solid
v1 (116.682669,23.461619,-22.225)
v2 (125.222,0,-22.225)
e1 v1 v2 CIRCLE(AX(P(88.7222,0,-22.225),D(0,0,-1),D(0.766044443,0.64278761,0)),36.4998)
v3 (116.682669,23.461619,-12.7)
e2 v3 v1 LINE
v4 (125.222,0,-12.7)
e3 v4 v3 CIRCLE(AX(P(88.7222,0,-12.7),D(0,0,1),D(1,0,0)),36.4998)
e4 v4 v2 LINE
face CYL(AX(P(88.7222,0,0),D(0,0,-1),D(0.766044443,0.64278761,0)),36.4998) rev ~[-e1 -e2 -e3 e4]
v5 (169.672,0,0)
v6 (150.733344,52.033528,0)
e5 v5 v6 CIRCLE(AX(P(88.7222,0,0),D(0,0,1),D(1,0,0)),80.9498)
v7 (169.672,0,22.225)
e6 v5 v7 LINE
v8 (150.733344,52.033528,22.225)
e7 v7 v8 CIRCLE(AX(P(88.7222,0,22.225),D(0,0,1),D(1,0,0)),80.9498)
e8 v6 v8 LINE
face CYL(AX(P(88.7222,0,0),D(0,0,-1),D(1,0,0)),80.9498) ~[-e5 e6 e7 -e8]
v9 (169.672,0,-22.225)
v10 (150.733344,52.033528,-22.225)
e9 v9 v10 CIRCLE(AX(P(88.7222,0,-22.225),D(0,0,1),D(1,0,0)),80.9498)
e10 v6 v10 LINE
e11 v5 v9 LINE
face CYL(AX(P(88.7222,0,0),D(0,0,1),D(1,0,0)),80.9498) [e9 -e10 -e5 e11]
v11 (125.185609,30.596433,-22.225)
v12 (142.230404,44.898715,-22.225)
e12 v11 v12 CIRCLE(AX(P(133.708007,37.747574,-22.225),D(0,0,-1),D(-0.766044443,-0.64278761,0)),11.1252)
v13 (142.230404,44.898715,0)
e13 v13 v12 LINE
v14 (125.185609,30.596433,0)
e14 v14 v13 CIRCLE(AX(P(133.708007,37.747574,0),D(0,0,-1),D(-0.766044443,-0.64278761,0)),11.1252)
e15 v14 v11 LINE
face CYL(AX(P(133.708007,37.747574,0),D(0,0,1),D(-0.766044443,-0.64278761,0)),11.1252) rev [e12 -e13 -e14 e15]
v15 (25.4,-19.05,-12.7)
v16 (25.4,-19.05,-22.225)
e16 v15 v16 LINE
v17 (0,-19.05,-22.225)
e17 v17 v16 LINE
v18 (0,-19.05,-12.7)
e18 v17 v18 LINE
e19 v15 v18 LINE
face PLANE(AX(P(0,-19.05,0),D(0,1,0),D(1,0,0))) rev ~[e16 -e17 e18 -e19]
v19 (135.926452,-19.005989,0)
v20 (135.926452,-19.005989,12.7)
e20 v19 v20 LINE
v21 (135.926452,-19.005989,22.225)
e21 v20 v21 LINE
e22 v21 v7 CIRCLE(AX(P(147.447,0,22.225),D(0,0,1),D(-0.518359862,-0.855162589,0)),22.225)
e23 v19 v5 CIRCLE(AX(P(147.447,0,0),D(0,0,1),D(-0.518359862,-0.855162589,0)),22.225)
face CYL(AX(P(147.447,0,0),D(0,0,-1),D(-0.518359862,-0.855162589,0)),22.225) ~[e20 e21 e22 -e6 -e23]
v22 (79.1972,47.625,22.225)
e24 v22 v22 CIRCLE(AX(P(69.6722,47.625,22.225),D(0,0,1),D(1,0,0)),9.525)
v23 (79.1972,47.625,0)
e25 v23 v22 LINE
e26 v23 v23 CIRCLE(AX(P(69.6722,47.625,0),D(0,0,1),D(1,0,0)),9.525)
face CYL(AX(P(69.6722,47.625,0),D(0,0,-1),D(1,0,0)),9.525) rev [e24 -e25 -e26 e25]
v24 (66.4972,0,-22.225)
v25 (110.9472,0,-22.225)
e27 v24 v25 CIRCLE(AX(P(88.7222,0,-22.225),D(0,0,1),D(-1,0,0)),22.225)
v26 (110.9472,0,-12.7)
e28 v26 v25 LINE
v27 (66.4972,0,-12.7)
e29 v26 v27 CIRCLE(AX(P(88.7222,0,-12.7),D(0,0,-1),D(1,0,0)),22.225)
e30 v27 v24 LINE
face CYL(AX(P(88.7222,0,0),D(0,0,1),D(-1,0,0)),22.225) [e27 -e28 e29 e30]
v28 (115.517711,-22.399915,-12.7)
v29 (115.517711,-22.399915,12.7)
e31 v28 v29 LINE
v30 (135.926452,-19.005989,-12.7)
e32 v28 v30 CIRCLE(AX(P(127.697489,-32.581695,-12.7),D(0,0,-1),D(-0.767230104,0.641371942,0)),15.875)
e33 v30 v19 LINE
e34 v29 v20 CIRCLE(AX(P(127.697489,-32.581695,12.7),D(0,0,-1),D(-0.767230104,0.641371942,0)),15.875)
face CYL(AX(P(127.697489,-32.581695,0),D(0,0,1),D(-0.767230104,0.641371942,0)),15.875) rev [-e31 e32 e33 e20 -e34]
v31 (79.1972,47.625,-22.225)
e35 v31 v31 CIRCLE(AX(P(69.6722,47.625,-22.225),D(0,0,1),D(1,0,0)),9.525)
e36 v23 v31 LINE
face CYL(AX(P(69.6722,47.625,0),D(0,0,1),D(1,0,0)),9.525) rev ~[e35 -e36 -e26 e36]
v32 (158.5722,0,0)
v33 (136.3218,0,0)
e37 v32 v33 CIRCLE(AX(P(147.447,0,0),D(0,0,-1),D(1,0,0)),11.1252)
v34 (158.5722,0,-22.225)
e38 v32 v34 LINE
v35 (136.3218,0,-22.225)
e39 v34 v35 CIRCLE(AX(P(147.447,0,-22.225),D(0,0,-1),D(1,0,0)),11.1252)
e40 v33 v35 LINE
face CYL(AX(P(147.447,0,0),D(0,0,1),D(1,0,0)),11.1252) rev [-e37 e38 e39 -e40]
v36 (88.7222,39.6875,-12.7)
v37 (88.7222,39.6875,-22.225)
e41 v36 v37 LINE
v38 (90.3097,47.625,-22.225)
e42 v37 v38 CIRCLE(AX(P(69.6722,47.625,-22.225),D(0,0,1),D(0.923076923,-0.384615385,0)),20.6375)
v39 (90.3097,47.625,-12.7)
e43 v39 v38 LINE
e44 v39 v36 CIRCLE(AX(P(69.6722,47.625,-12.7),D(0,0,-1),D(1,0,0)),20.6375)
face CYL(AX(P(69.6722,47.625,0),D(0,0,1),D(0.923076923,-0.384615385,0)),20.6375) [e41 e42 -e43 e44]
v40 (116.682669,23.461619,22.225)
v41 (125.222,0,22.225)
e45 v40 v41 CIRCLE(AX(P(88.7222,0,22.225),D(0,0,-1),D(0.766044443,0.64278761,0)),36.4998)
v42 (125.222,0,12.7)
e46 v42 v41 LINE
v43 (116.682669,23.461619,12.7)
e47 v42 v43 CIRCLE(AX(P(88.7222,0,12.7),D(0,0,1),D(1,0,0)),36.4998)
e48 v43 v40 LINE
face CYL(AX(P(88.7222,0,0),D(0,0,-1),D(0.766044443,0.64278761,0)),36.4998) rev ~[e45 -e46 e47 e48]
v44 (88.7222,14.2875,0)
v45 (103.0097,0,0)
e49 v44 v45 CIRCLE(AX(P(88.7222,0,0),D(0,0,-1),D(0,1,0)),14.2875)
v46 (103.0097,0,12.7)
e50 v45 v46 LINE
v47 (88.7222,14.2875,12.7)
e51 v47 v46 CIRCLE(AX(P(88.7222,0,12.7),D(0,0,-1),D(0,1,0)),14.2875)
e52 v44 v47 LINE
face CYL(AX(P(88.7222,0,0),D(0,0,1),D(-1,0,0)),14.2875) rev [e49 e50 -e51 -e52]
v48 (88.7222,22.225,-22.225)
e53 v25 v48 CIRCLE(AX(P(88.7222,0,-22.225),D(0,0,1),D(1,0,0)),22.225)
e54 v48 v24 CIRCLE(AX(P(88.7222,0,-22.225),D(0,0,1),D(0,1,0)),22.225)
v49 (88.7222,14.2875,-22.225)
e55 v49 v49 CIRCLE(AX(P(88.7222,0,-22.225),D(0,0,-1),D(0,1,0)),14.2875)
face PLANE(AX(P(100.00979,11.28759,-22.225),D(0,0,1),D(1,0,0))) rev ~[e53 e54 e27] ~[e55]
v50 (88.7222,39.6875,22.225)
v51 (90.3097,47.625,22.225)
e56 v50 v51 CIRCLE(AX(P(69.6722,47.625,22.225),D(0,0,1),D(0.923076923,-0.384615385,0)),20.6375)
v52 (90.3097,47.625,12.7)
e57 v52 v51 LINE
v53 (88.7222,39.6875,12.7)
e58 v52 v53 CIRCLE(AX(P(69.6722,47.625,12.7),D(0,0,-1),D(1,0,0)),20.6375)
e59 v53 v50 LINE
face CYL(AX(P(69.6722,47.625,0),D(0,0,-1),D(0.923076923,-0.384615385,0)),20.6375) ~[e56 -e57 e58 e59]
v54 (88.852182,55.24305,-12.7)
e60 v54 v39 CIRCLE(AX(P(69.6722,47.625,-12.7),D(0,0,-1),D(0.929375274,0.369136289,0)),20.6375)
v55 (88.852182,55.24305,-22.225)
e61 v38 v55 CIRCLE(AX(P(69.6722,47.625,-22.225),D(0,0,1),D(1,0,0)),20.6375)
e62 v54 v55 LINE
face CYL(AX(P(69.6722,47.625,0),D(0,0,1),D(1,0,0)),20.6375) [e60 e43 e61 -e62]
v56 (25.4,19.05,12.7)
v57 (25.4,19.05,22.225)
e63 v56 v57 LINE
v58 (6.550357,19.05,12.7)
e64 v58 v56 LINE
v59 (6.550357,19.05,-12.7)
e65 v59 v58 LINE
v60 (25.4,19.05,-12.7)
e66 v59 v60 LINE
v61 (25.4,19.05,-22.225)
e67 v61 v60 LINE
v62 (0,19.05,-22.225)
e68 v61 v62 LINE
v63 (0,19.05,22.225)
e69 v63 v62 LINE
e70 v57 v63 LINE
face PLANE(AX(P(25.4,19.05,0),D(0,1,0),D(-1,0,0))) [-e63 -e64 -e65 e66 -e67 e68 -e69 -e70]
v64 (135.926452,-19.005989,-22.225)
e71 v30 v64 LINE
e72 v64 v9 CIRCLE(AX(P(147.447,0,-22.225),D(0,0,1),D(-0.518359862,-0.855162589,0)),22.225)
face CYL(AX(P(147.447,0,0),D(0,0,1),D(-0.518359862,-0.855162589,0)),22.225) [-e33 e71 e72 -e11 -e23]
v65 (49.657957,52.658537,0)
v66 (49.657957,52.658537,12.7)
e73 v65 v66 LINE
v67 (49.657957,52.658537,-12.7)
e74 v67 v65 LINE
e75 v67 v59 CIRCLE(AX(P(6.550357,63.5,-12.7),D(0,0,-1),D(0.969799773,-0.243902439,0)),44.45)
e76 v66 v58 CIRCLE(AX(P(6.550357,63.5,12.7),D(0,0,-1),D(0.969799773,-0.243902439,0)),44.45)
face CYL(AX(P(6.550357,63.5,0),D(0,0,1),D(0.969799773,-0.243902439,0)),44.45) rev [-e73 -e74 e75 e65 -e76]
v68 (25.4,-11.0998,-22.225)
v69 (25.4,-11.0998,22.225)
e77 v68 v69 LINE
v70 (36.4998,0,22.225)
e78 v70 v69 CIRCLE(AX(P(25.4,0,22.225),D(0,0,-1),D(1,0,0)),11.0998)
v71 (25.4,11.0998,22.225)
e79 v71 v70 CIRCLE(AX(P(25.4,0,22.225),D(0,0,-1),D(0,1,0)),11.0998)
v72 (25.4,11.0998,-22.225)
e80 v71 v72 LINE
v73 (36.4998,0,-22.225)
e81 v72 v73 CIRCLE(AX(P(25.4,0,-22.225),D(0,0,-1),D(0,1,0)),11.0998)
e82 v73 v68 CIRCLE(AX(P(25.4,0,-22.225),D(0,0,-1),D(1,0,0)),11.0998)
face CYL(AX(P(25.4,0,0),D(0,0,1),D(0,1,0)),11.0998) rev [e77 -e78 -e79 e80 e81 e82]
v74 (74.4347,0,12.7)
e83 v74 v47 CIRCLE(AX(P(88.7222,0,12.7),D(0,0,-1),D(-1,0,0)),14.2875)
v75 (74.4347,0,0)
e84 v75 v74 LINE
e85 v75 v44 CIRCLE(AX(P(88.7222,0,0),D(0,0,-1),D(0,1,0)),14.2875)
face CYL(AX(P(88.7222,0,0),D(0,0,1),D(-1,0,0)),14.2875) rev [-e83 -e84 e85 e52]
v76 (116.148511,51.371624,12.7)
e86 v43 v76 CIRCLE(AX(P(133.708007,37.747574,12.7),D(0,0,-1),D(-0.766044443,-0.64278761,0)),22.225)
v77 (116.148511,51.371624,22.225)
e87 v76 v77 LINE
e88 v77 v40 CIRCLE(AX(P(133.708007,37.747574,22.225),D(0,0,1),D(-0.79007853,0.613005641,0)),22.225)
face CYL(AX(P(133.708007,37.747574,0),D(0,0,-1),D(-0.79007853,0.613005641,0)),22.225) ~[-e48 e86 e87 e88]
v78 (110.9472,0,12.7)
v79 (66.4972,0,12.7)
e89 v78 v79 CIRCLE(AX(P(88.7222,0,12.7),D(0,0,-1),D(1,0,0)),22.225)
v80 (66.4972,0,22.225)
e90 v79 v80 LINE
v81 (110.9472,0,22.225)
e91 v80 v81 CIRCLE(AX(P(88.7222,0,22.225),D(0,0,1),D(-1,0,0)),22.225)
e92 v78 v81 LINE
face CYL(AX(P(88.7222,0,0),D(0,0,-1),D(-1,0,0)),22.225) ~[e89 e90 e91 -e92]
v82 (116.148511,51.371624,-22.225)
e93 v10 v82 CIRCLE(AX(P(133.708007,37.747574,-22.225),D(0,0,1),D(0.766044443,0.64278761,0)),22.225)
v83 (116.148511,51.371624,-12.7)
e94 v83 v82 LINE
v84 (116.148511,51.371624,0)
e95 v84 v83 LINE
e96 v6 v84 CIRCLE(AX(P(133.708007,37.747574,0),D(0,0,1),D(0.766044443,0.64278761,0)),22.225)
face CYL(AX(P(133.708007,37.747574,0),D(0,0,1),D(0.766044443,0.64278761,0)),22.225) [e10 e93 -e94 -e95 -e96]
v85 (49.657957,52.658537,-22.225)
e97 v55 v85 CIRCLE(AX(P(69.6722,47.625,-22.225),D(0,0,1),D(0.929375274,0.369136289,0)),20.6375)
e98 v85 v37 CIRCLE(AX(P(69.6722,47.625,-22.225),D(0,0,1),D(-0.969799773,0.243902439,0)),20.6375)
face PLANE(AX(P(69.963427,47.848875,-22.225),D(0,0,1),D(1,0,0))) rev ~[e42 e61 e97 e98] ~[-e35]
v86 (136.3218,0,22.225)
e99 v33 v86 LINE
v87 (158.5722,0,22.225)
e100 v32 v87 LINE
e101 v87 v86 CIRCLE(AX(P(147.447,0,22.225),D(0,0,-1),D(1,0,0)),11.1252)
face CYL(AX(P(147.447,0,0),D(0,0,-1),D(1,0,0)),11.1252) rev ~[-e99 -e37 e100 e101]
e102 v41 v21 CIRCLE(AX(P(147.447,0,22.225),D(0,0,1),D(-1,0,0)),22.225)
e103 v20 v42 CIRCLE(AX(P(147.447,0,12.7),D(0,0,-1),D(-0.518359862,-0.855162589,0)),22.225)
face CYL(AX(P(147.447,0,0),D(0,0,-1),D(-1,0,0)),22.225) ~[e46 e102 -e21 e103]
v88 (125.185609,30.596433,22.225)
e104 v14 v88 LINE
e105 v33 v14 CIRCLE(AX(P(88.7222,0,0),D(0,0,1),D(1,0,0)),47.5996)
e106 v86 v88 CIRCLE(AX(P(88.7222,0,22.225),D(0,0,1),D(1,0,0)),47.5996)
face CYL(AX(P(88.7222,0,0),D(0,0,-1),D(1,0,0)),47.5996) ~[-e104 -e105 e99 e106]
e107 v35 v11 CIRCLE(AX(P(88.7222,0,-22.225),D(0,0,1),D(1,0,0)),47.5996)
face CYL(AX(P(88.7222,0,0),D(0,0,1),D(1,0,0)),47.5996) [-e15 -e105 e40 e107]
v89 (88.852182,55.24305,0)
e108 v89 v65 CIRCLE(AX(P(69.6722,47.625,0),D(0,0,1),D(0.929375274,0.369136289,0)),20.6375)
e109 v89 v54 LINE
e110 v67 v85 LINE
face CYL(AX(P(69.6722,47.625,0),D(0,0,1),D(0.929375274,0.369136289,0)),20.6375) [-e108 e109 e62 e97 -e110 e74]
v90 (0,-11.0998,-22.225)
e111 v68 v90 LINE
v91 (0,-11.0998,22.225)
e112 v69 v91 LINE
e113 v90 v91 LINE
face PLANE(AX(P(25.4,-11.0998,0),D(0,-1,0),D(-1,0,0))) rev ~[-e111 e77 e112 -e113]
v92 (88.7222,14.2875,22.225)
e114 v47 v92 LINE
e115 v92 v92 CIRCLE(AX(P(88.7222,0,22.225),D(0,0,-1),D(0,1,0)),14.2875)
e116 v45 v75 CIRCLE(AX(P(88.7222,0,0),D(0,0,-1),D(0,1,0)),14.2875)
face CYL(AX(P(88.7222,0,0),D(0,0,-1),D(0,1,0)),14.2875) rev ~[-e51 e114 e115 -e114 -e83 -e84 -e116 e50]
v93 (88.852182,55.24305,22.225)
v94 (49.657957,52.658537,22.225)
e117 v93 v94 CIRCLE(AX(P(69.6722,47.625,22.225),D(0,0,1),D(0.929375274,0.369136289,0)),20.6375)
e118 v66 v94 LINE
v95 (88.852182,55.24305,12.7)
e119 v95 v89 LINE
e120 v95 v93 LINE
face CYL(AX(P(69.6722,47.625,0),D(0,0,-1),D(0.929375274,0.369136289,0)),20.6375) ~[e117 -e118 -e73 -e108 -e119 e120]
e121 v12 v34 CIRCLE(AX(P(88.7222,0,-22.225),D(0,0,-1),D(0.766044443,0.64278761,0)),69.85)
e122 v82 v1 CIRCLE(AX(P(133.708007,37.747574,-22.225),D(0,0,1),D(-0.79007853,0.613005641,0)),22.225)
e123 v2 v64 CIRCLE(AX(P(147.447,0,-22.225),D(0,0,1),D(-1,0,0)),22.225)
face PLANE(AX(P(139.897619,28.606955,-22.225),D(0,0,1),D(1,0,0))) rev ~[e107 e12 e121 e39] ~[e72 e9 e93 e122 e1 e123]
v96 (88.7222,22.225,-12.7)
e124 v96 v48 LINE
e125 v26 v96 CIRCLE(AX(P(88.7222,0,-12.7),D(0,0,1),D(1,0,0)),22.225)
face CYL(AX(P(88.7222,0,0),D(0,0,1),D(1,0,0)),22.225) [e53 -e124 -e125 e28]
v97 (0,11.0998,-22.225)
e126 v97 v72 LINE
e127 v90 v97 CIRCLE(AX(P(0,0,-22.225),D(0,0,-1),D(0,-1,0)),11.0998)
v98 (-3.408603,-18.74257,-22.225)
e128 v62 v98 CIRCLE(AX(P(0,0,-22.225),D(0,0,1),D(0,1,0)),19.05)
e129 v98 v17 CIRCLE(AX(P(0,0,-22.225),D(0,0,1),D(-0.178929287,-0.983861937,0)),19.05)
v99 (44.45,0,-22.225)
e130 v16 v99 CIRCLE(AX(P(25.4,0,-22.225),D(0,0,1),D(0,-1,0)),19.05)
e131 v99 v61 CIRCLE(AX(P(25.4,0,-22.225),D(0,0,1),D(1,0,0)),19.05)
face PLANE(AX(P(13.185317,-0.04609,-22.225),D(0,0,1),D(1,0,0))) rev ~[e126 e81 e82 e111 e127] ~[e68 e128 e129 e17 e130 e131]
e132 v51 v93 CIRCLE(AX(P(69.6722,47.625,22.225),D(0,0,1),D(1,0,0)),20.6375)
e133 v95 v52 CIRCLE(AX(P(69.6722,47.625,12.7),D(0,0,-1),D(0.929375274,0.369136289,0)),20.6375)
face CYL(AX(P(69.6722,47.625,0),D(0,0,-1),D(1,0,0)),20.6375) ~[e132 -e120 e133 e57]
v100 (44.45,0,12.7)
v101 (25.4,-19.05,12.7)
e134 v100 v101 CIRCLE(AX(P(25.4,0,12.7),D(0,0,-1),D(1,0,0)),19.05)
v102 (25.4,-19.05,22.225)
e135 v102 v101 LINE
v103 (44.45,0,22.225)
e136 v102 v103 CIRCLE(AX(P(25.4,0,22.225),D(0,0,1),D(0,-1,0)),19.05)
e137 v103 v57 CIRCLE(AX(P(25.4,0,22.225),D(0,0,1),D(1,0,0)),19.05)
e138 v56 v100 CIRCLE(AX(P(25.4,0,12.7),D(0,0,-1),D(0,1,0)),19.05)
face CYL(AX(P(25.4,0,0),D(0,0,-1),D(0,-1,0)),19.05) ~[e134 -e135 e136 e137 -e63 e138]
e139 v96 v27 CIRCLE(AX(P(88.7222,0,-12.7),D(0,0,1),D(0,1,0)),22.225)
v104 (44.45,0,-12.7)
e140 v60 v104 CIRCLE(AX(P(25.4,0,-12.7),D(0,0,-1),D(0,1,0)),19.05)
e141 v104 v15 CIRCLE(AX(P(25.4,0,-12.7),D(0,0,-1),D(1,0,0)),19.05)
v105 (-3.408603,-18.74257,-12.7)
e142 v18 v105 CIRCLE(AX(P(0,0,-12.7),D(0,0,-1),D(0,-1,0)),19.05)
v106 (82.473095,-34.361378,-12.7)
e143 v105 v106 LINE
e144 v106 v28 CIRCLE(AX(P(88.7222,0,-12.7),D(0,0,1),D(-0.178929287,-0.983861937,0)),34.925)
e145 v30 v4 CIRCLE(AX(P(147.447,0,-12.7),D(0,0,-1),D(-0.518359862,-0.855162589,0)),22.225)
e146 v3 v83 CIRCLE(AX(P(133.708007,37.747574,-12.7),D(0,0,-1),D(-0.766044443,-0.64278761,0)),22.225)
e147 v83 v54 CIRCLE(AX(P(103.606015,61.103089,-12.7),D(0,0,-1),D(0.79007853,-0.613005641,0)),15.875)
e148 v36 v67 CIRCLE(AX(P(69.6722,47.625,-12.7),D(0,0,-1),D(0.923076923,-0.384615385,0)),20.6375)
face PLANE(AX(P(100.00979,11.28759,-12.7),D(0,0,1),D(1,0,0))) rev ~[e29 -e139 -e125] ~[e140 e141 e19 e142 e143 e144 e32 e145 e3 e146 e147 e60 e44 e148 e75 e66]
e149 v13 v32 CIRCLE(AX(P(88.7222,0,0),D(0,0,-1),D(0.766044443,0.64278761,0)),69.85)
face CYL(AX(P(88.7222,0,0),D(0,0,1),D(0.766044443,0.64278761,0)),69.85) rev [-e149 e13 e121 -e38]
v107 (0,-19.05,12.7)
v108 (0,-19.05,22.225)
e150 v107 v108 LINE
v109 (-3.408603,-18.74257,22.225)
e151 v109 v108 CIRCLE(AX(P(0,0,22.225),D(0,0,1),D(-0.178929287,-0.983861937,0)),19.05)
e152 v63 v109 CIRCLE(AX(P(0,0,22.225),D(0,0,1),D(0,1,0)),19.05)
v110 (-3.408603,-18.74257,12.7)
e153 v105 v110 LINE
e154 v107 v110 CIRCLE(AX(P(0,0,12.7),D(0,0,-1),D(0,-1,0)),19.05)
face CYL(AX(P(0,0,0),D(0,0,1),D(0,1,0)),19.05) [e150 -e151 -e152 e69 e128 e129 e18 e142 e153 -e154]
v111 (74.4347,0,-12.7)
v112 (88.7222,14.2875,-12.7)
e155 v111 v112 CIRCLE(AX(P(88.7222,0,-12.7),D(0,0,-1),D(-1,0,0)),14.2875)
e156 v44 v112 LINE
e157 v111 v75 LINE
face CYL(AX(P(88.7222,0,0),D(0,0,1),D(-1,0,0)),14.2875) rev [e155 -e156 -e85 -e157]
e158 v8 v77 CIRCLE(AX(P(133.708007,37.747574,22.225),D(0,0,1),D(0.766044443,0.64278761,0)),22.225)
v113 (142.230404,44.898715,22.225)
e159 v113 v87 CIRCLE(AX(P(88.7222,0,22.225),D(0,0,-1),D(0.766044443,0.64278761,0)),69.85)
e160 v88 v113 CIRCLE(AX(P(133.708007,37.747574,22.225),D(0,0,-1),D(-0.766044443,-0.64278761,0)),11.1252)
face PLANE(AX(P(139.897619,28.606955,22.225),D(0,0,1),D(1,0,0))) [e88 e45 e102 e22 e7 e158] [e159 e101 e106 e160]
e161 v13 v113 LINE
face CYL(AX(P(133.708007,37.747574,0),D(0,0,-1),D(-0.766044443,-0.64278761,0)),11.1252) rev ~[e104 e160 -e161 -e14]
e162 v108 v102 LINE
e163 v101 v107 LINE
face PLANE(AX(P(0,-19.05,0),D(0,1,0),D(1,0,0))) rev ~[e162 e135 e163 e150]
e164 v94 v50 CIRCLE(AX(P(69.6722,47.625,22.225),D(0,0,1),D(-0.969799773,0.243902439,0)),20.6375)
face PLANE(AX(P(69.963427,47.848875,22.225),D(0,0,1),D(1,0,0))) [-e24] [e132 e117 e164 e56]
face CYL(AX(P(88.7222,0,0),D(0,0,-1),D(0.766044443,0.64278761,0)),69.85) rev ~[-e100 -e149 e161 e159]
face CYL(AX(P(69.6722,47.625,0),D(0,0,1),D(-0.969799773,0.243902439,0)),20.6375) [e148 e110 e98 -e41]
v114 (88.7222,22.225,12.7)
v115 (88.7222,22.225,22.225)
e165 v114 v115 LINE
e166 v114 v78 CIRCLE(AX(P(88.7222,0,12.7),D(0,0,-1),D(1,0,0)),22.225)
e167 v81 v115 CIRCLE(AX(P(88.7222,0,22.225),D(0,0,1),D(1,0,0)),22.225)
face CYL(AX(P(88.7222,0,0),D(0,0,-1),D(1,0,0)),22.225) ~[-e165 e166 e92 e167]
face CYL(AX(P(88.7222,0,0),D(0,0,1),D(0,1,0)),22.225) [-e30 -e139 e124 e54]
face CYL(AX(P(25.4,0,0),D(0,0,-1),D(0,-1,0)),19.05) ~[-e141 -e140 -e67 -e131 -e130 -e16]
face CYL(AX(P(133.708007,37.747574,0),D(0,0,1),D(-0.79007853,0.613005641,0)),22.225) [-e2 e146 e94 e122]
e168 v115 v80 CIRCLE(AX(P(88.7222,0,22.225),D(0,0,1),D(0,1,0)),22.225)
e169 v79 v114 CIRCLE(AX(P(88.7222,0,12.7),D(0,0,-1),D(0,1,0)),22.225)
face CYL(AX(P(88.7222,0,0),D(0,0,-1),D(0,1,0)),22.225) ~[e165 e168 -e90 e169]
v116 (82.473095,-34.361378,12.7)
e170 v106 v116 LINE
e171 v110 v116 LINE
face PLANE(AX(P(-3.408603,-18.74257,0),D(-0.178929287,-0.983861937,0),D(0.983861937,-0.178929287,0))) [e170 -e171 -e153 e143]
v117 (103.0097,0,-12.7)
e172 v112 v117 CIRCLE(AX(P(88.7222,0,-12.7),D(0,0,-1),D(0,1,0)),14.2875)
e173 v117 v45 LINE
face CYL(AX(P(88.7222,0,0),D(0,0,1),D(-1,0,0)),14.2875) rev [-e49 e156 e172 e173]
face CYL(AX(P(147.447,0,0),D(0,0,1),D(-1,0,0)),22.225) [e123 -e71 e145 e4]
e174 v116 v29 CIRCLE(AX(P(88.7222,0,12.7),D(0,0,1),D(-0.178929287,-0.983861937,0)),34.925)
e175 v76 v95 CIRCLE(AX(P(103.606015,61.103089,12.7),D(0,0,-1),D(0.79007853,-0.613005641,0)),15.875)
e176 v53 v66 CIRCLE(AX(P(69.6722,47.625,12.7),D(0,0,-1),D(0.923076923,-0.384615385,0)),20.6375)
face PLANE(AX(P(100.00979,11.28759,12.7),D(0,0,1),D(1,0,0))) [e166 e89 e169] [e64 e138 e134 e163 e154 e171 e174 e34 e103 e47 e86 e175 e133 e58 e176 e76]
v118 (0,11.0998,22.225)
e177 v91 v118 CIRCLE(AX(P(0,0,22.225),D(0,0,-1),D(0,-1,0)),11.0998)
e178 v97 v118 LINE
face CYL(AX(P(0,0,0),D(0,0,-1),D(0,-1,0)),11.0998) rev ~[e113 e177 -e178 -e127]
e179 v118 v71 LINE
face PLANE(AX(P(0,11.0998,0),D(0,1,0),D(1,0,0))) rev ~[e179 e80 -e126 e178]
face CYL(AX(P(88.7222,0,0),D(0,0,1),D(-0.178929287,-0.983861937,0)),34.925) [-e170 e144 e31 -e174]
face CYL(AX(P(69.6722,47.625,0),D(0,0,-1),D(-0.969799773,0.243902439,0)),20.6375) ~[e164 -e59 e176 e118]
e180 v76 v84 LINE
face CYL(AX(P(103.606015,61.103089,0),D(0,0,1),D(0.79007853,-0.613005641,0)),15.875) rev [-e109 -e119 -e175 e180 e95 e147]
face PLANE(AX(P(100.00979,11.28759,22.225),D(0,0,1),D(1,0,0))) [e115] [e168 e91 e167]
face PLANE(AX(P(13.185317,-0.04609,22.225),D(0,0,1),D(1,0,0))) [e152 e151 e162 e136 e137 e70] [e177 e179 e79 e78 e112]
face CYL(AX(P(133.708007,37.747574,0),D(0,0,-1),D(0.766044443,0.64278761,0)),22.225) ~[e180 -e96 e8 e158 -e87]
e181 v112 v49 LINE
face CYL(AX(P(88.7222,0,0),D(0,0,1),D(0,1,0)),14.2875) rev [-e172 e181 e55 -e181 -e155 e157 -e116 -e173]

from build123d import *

# Parameters (mm, degrees)
F1_DEPTH = 12.7
F0_R     = 9.525
F2_DEPTH = 22.225


with BuildPart() as f1:
    # F0 (on Top) → F1 (new body, symmetric)
    with BuildSketch(Plane.XY):
        with BuildLine():
            ThreePointArc((88.7222, 14.2875), (98.8249881362, 10.1027881362), (103.0097, 0))
            Line((103.0097, 0), (110.9472, 0))
            ThreePointArc((110.9472, 0), (104.4376482119, 15.7154482119), (88.7222, 22.225))
            Line((88.7222, 22.225), (88.7222, 14.2875))
        make_face()
        with BuildLine():
            Line((66.4972, 0), (74.4347, 0))
            ThreePointArc((74.4347, 0), (78.6194118638, 10.1027881362), (88.7222, 14.2875))
            Line((88.7222, 14.2875), (88.7222, 22.225))
            ThreePointArc((88.7222, 22.225), (73.0067517881, 15.7154482119), (66.4972, 0))
        make_face()
        with BuildLine():
            ThreePointArc((88.7222, 22.225), (104.4376482119, 15.7154482119), (110.9472, 0))
            Line((110.9472, 0), (125.222, 0))
            ThreePointArc((125.222, 0), (123.0207927202, 12.4836668274), (116.682668965, 23.461619196))
            ThreePointArc((116.682668965, 23.461619196), (111.4870759361, 37.3222969765), (116.1485113735, 51.3716241887))
            ThreePointArc((116.1485113735, 51.3716241887), (101.3767802444, 45.3853872913), (88.852182223, 55.2430501556))
            ThreePointArc((88.852182223, 55.2430501556), (89.9420456997, 51.5031131444), (90.3097, 47.625))
            ThreePointArc((90.3097, 47.625), (89.9089336946, 43.5776532611), (88.7222, 39.6875))
            Line((88.7222, 39.6875), (88.7222, 22.225))
        make_face()
        with BuildLine():
            Line((125.222, 0), (110.9472, 0))
            ThreePointArc((110.9472, 0), (88.7222, -22.225), (66.4972, 0))
            Line((66.4972, 0), (44.45, 0))
            ThreePointArc((44.45, 0), (38.8703841816, -13.4703841816), (25.4, -19.05))
            Line((25.4, -19.05), (0, -19.05))
            ThreePointArc((0, -19.05), (-1.7112193853, -18.9729868027), (-3.4086029201, -18.7425698914))
            Line((-3.4086029201, -18.7425698914), (82.4730946464, -34.3613781342))
            ThreePointArc((82.4730946464, -34.3613781342), (100.6094978328, -32.8397286109), (115.5177113754, -22.3999150697))
            ThreePointArc((115.5177113754, -22.3999150697), (125.0932774359, -16.9217551289), (135.9264520761, -19.005988544))
            ThreePointArc((135.9264520761, -19.005988544), (128.0821503671, -10.9065679155), (125.222, 0))
        make_face()
        with BuildLine():
            Line((44.45, 0), (66.4972, 0))
            ThreePointArc((66.4972, 0), (73.0067517881, 15.7154482119), (88.7222, 22.225))
            Line((88.7222, 22.225), (88.7222, 39.6875))
            ThreePointArc((88.7222, 39.6875), (63.1687863903, 28.0389841297), (49.6579571791, 52.6585365854))
            ThreePointArc((49.6579571791, 52.6585365854), (33.8807382573, 28.4450035745), (6.5503572572, 19.05))
            Line((6.5503572572, 19.05), (25.4, 19.05))
            ThreePointArc((25.4, 19.05), (38.8703841816, 13.4703841816), (44.45, 0))
        make_face()
    extrude(amount=F1_DEPTH, both=True)

    # F0 (on Top) → F2 (join, symmetric)
    with BuildSketch(Plane.XY):
        with BuildLine():
            ThreePointArc((88.7222, 14.2875), (98.8249881362, 10.1027881362), (103.0097, 0))
            Line((103.0097, 0), (110.9472, 0))
            ThreePointArc((110.9472, 0), (104.4376482119, 15.7154482119), (88.7222, 22.225))
            Line((88.7222, 22.225), (88.7222, 14.2875))
        make_face()
        with BuildLine():
            Line((110.9472, 0), (103.0097, 0))
            ThreePointArc((103.0097, 0), (88.7222, -14.2875), (74.4347, 0))
            Line((74.4347, 0), (66.4972, 0))
            ThreePointArc((66.4972, 0), (88.7222, -22.225), (110.9472, 0))
        make_face()
        with BuildLine():
            Line((66.4972, 0), (74.4347, 0))
            ThreePointArc((74.4347, 0), (78.6194118638, 10.1027881362), (88.7222, 14.2875))
            Line((88.7222, 14.2875), (88.7222, 22.225))
            ThreePointArc((88.7222, 22.225), (73.0067517881, 15.7154482119), (66.4972, 0))
        make_face()
        with BuildLine():
            ThreePointArc((116.682668965, 23.461619196), (123.0207927202, 12.4836668274), (125.222, 0))
            Line((125.222, 0), (136.3218, 0))
            ThreePointArc((136.3218, 0), (133.4511928724, 16.2800220142), (125.1856090747, 30.596433106))
            ThreePointArc((125.1856090747, 30.596433106), (126.556865998, 46.2699714599), (142.2304043519, 44.8987145366))
            ThreePointArc((142.2304043519, 44.8987145366), (154.3597295619, 23.8901070113), (158.5722, 0))
            Line((158.5722, 0), (169.672, 0))
            ThreePointArc((169.672, 0), (164.7901297141, 27.6864621982), (150.7333444616, 52.0335284466))
            ThreePointArc((150.7333444616, 52.0335284466), (133.2827298684, 59.9685045985), (116.1485113735, 51.3716241887))
            ThreePointArc((116.1485113735, 51.3716241887), (111.4870759361, 37.3222969765), (116.682668965, 23.461619196))
        make_face()
        with BuildLine():
            Line((136.3218, 0), (125.222, 0))
            ThreePointArc((125.222, 0), (128.0821503671, -10.9065679155), (135.9264520761, -19.005988544))
            ThreePointArc((135.9264520761, -19.005988544), (158.3535679155, -19.3648496329), (169.672, 0))
            Line((169.672, 0), (158.5722, 0))
            ThreePointArc((158.5722, 0), (147.447, -11.1252), (136.3218, 0))
        make_face()
        with BuildLine():
            ThreePointArc((25.4, -19.05), (38.8703841816, -13.4703841816), (44.45, 0))
            ThreePointArc((44.45, 0), (38.8703841816, 13.4703841816), (25.4, 19.05))
            Line((25.4, 19.05), (6.5503572572, 19.05))
            Line((6.5503572572, 19.05), (0, 19.05))
            ThreePointArc((0, 19.05), (-18.9729868027, 1.7112193853), (-3.4086029201, -18.7425698914))
            ThreePointArc((-3.4086029201, -18.7425698914), (-1.7112193853, -18.9729868027), (0, -19.05))
            Line((0, -19.05), (25.4, -19.05))
        make_face()
        with BuildLine():
            ThreePointArc((25.4, 11.0998), (33.2487438498, 7.8487438498), (36.4998, 0))
            ThreePointArc((36.4998, 0), (33.2487438498, -7.8487438498), (25.4, -11.0998))
            Line((25.4, -11.0998), (0, -11.0998))
            ThreePointArc((0, -11.0998), (-11.0998, 0), (0, 11.0998))
            Line((0, 11.0998), (25.4, 11.0998))
        make_face(mode=Mode.SUBTRACT)
        with BuildLine():
            ThreePointArc((49.6579571791, 52.6585365854), (63.1687863903, 28.0389841297), (88.7222, 39.6875))
            ThreePointArc((88.7222, 39.6875), (89.9089336946, 43.5776532611), (90.3097, 47.625))
            ThreePointArc((90.3097, 47.625), (89.9420456997, 51.5031131444), (88.852182223, 55.2430501556))
            ThreePointArc((88.852182223, 55.2430501556), (68.314287895, 68.217777398), (49.6579571791, 52.6585365854))
        make_face()
        with Locations((69.6722, 47.625)):
            Circle(F0_R, mode=Mode.SUBTRACT)
    extrude(amount=F2_DEPTH, both=True)


solid = f1.part
